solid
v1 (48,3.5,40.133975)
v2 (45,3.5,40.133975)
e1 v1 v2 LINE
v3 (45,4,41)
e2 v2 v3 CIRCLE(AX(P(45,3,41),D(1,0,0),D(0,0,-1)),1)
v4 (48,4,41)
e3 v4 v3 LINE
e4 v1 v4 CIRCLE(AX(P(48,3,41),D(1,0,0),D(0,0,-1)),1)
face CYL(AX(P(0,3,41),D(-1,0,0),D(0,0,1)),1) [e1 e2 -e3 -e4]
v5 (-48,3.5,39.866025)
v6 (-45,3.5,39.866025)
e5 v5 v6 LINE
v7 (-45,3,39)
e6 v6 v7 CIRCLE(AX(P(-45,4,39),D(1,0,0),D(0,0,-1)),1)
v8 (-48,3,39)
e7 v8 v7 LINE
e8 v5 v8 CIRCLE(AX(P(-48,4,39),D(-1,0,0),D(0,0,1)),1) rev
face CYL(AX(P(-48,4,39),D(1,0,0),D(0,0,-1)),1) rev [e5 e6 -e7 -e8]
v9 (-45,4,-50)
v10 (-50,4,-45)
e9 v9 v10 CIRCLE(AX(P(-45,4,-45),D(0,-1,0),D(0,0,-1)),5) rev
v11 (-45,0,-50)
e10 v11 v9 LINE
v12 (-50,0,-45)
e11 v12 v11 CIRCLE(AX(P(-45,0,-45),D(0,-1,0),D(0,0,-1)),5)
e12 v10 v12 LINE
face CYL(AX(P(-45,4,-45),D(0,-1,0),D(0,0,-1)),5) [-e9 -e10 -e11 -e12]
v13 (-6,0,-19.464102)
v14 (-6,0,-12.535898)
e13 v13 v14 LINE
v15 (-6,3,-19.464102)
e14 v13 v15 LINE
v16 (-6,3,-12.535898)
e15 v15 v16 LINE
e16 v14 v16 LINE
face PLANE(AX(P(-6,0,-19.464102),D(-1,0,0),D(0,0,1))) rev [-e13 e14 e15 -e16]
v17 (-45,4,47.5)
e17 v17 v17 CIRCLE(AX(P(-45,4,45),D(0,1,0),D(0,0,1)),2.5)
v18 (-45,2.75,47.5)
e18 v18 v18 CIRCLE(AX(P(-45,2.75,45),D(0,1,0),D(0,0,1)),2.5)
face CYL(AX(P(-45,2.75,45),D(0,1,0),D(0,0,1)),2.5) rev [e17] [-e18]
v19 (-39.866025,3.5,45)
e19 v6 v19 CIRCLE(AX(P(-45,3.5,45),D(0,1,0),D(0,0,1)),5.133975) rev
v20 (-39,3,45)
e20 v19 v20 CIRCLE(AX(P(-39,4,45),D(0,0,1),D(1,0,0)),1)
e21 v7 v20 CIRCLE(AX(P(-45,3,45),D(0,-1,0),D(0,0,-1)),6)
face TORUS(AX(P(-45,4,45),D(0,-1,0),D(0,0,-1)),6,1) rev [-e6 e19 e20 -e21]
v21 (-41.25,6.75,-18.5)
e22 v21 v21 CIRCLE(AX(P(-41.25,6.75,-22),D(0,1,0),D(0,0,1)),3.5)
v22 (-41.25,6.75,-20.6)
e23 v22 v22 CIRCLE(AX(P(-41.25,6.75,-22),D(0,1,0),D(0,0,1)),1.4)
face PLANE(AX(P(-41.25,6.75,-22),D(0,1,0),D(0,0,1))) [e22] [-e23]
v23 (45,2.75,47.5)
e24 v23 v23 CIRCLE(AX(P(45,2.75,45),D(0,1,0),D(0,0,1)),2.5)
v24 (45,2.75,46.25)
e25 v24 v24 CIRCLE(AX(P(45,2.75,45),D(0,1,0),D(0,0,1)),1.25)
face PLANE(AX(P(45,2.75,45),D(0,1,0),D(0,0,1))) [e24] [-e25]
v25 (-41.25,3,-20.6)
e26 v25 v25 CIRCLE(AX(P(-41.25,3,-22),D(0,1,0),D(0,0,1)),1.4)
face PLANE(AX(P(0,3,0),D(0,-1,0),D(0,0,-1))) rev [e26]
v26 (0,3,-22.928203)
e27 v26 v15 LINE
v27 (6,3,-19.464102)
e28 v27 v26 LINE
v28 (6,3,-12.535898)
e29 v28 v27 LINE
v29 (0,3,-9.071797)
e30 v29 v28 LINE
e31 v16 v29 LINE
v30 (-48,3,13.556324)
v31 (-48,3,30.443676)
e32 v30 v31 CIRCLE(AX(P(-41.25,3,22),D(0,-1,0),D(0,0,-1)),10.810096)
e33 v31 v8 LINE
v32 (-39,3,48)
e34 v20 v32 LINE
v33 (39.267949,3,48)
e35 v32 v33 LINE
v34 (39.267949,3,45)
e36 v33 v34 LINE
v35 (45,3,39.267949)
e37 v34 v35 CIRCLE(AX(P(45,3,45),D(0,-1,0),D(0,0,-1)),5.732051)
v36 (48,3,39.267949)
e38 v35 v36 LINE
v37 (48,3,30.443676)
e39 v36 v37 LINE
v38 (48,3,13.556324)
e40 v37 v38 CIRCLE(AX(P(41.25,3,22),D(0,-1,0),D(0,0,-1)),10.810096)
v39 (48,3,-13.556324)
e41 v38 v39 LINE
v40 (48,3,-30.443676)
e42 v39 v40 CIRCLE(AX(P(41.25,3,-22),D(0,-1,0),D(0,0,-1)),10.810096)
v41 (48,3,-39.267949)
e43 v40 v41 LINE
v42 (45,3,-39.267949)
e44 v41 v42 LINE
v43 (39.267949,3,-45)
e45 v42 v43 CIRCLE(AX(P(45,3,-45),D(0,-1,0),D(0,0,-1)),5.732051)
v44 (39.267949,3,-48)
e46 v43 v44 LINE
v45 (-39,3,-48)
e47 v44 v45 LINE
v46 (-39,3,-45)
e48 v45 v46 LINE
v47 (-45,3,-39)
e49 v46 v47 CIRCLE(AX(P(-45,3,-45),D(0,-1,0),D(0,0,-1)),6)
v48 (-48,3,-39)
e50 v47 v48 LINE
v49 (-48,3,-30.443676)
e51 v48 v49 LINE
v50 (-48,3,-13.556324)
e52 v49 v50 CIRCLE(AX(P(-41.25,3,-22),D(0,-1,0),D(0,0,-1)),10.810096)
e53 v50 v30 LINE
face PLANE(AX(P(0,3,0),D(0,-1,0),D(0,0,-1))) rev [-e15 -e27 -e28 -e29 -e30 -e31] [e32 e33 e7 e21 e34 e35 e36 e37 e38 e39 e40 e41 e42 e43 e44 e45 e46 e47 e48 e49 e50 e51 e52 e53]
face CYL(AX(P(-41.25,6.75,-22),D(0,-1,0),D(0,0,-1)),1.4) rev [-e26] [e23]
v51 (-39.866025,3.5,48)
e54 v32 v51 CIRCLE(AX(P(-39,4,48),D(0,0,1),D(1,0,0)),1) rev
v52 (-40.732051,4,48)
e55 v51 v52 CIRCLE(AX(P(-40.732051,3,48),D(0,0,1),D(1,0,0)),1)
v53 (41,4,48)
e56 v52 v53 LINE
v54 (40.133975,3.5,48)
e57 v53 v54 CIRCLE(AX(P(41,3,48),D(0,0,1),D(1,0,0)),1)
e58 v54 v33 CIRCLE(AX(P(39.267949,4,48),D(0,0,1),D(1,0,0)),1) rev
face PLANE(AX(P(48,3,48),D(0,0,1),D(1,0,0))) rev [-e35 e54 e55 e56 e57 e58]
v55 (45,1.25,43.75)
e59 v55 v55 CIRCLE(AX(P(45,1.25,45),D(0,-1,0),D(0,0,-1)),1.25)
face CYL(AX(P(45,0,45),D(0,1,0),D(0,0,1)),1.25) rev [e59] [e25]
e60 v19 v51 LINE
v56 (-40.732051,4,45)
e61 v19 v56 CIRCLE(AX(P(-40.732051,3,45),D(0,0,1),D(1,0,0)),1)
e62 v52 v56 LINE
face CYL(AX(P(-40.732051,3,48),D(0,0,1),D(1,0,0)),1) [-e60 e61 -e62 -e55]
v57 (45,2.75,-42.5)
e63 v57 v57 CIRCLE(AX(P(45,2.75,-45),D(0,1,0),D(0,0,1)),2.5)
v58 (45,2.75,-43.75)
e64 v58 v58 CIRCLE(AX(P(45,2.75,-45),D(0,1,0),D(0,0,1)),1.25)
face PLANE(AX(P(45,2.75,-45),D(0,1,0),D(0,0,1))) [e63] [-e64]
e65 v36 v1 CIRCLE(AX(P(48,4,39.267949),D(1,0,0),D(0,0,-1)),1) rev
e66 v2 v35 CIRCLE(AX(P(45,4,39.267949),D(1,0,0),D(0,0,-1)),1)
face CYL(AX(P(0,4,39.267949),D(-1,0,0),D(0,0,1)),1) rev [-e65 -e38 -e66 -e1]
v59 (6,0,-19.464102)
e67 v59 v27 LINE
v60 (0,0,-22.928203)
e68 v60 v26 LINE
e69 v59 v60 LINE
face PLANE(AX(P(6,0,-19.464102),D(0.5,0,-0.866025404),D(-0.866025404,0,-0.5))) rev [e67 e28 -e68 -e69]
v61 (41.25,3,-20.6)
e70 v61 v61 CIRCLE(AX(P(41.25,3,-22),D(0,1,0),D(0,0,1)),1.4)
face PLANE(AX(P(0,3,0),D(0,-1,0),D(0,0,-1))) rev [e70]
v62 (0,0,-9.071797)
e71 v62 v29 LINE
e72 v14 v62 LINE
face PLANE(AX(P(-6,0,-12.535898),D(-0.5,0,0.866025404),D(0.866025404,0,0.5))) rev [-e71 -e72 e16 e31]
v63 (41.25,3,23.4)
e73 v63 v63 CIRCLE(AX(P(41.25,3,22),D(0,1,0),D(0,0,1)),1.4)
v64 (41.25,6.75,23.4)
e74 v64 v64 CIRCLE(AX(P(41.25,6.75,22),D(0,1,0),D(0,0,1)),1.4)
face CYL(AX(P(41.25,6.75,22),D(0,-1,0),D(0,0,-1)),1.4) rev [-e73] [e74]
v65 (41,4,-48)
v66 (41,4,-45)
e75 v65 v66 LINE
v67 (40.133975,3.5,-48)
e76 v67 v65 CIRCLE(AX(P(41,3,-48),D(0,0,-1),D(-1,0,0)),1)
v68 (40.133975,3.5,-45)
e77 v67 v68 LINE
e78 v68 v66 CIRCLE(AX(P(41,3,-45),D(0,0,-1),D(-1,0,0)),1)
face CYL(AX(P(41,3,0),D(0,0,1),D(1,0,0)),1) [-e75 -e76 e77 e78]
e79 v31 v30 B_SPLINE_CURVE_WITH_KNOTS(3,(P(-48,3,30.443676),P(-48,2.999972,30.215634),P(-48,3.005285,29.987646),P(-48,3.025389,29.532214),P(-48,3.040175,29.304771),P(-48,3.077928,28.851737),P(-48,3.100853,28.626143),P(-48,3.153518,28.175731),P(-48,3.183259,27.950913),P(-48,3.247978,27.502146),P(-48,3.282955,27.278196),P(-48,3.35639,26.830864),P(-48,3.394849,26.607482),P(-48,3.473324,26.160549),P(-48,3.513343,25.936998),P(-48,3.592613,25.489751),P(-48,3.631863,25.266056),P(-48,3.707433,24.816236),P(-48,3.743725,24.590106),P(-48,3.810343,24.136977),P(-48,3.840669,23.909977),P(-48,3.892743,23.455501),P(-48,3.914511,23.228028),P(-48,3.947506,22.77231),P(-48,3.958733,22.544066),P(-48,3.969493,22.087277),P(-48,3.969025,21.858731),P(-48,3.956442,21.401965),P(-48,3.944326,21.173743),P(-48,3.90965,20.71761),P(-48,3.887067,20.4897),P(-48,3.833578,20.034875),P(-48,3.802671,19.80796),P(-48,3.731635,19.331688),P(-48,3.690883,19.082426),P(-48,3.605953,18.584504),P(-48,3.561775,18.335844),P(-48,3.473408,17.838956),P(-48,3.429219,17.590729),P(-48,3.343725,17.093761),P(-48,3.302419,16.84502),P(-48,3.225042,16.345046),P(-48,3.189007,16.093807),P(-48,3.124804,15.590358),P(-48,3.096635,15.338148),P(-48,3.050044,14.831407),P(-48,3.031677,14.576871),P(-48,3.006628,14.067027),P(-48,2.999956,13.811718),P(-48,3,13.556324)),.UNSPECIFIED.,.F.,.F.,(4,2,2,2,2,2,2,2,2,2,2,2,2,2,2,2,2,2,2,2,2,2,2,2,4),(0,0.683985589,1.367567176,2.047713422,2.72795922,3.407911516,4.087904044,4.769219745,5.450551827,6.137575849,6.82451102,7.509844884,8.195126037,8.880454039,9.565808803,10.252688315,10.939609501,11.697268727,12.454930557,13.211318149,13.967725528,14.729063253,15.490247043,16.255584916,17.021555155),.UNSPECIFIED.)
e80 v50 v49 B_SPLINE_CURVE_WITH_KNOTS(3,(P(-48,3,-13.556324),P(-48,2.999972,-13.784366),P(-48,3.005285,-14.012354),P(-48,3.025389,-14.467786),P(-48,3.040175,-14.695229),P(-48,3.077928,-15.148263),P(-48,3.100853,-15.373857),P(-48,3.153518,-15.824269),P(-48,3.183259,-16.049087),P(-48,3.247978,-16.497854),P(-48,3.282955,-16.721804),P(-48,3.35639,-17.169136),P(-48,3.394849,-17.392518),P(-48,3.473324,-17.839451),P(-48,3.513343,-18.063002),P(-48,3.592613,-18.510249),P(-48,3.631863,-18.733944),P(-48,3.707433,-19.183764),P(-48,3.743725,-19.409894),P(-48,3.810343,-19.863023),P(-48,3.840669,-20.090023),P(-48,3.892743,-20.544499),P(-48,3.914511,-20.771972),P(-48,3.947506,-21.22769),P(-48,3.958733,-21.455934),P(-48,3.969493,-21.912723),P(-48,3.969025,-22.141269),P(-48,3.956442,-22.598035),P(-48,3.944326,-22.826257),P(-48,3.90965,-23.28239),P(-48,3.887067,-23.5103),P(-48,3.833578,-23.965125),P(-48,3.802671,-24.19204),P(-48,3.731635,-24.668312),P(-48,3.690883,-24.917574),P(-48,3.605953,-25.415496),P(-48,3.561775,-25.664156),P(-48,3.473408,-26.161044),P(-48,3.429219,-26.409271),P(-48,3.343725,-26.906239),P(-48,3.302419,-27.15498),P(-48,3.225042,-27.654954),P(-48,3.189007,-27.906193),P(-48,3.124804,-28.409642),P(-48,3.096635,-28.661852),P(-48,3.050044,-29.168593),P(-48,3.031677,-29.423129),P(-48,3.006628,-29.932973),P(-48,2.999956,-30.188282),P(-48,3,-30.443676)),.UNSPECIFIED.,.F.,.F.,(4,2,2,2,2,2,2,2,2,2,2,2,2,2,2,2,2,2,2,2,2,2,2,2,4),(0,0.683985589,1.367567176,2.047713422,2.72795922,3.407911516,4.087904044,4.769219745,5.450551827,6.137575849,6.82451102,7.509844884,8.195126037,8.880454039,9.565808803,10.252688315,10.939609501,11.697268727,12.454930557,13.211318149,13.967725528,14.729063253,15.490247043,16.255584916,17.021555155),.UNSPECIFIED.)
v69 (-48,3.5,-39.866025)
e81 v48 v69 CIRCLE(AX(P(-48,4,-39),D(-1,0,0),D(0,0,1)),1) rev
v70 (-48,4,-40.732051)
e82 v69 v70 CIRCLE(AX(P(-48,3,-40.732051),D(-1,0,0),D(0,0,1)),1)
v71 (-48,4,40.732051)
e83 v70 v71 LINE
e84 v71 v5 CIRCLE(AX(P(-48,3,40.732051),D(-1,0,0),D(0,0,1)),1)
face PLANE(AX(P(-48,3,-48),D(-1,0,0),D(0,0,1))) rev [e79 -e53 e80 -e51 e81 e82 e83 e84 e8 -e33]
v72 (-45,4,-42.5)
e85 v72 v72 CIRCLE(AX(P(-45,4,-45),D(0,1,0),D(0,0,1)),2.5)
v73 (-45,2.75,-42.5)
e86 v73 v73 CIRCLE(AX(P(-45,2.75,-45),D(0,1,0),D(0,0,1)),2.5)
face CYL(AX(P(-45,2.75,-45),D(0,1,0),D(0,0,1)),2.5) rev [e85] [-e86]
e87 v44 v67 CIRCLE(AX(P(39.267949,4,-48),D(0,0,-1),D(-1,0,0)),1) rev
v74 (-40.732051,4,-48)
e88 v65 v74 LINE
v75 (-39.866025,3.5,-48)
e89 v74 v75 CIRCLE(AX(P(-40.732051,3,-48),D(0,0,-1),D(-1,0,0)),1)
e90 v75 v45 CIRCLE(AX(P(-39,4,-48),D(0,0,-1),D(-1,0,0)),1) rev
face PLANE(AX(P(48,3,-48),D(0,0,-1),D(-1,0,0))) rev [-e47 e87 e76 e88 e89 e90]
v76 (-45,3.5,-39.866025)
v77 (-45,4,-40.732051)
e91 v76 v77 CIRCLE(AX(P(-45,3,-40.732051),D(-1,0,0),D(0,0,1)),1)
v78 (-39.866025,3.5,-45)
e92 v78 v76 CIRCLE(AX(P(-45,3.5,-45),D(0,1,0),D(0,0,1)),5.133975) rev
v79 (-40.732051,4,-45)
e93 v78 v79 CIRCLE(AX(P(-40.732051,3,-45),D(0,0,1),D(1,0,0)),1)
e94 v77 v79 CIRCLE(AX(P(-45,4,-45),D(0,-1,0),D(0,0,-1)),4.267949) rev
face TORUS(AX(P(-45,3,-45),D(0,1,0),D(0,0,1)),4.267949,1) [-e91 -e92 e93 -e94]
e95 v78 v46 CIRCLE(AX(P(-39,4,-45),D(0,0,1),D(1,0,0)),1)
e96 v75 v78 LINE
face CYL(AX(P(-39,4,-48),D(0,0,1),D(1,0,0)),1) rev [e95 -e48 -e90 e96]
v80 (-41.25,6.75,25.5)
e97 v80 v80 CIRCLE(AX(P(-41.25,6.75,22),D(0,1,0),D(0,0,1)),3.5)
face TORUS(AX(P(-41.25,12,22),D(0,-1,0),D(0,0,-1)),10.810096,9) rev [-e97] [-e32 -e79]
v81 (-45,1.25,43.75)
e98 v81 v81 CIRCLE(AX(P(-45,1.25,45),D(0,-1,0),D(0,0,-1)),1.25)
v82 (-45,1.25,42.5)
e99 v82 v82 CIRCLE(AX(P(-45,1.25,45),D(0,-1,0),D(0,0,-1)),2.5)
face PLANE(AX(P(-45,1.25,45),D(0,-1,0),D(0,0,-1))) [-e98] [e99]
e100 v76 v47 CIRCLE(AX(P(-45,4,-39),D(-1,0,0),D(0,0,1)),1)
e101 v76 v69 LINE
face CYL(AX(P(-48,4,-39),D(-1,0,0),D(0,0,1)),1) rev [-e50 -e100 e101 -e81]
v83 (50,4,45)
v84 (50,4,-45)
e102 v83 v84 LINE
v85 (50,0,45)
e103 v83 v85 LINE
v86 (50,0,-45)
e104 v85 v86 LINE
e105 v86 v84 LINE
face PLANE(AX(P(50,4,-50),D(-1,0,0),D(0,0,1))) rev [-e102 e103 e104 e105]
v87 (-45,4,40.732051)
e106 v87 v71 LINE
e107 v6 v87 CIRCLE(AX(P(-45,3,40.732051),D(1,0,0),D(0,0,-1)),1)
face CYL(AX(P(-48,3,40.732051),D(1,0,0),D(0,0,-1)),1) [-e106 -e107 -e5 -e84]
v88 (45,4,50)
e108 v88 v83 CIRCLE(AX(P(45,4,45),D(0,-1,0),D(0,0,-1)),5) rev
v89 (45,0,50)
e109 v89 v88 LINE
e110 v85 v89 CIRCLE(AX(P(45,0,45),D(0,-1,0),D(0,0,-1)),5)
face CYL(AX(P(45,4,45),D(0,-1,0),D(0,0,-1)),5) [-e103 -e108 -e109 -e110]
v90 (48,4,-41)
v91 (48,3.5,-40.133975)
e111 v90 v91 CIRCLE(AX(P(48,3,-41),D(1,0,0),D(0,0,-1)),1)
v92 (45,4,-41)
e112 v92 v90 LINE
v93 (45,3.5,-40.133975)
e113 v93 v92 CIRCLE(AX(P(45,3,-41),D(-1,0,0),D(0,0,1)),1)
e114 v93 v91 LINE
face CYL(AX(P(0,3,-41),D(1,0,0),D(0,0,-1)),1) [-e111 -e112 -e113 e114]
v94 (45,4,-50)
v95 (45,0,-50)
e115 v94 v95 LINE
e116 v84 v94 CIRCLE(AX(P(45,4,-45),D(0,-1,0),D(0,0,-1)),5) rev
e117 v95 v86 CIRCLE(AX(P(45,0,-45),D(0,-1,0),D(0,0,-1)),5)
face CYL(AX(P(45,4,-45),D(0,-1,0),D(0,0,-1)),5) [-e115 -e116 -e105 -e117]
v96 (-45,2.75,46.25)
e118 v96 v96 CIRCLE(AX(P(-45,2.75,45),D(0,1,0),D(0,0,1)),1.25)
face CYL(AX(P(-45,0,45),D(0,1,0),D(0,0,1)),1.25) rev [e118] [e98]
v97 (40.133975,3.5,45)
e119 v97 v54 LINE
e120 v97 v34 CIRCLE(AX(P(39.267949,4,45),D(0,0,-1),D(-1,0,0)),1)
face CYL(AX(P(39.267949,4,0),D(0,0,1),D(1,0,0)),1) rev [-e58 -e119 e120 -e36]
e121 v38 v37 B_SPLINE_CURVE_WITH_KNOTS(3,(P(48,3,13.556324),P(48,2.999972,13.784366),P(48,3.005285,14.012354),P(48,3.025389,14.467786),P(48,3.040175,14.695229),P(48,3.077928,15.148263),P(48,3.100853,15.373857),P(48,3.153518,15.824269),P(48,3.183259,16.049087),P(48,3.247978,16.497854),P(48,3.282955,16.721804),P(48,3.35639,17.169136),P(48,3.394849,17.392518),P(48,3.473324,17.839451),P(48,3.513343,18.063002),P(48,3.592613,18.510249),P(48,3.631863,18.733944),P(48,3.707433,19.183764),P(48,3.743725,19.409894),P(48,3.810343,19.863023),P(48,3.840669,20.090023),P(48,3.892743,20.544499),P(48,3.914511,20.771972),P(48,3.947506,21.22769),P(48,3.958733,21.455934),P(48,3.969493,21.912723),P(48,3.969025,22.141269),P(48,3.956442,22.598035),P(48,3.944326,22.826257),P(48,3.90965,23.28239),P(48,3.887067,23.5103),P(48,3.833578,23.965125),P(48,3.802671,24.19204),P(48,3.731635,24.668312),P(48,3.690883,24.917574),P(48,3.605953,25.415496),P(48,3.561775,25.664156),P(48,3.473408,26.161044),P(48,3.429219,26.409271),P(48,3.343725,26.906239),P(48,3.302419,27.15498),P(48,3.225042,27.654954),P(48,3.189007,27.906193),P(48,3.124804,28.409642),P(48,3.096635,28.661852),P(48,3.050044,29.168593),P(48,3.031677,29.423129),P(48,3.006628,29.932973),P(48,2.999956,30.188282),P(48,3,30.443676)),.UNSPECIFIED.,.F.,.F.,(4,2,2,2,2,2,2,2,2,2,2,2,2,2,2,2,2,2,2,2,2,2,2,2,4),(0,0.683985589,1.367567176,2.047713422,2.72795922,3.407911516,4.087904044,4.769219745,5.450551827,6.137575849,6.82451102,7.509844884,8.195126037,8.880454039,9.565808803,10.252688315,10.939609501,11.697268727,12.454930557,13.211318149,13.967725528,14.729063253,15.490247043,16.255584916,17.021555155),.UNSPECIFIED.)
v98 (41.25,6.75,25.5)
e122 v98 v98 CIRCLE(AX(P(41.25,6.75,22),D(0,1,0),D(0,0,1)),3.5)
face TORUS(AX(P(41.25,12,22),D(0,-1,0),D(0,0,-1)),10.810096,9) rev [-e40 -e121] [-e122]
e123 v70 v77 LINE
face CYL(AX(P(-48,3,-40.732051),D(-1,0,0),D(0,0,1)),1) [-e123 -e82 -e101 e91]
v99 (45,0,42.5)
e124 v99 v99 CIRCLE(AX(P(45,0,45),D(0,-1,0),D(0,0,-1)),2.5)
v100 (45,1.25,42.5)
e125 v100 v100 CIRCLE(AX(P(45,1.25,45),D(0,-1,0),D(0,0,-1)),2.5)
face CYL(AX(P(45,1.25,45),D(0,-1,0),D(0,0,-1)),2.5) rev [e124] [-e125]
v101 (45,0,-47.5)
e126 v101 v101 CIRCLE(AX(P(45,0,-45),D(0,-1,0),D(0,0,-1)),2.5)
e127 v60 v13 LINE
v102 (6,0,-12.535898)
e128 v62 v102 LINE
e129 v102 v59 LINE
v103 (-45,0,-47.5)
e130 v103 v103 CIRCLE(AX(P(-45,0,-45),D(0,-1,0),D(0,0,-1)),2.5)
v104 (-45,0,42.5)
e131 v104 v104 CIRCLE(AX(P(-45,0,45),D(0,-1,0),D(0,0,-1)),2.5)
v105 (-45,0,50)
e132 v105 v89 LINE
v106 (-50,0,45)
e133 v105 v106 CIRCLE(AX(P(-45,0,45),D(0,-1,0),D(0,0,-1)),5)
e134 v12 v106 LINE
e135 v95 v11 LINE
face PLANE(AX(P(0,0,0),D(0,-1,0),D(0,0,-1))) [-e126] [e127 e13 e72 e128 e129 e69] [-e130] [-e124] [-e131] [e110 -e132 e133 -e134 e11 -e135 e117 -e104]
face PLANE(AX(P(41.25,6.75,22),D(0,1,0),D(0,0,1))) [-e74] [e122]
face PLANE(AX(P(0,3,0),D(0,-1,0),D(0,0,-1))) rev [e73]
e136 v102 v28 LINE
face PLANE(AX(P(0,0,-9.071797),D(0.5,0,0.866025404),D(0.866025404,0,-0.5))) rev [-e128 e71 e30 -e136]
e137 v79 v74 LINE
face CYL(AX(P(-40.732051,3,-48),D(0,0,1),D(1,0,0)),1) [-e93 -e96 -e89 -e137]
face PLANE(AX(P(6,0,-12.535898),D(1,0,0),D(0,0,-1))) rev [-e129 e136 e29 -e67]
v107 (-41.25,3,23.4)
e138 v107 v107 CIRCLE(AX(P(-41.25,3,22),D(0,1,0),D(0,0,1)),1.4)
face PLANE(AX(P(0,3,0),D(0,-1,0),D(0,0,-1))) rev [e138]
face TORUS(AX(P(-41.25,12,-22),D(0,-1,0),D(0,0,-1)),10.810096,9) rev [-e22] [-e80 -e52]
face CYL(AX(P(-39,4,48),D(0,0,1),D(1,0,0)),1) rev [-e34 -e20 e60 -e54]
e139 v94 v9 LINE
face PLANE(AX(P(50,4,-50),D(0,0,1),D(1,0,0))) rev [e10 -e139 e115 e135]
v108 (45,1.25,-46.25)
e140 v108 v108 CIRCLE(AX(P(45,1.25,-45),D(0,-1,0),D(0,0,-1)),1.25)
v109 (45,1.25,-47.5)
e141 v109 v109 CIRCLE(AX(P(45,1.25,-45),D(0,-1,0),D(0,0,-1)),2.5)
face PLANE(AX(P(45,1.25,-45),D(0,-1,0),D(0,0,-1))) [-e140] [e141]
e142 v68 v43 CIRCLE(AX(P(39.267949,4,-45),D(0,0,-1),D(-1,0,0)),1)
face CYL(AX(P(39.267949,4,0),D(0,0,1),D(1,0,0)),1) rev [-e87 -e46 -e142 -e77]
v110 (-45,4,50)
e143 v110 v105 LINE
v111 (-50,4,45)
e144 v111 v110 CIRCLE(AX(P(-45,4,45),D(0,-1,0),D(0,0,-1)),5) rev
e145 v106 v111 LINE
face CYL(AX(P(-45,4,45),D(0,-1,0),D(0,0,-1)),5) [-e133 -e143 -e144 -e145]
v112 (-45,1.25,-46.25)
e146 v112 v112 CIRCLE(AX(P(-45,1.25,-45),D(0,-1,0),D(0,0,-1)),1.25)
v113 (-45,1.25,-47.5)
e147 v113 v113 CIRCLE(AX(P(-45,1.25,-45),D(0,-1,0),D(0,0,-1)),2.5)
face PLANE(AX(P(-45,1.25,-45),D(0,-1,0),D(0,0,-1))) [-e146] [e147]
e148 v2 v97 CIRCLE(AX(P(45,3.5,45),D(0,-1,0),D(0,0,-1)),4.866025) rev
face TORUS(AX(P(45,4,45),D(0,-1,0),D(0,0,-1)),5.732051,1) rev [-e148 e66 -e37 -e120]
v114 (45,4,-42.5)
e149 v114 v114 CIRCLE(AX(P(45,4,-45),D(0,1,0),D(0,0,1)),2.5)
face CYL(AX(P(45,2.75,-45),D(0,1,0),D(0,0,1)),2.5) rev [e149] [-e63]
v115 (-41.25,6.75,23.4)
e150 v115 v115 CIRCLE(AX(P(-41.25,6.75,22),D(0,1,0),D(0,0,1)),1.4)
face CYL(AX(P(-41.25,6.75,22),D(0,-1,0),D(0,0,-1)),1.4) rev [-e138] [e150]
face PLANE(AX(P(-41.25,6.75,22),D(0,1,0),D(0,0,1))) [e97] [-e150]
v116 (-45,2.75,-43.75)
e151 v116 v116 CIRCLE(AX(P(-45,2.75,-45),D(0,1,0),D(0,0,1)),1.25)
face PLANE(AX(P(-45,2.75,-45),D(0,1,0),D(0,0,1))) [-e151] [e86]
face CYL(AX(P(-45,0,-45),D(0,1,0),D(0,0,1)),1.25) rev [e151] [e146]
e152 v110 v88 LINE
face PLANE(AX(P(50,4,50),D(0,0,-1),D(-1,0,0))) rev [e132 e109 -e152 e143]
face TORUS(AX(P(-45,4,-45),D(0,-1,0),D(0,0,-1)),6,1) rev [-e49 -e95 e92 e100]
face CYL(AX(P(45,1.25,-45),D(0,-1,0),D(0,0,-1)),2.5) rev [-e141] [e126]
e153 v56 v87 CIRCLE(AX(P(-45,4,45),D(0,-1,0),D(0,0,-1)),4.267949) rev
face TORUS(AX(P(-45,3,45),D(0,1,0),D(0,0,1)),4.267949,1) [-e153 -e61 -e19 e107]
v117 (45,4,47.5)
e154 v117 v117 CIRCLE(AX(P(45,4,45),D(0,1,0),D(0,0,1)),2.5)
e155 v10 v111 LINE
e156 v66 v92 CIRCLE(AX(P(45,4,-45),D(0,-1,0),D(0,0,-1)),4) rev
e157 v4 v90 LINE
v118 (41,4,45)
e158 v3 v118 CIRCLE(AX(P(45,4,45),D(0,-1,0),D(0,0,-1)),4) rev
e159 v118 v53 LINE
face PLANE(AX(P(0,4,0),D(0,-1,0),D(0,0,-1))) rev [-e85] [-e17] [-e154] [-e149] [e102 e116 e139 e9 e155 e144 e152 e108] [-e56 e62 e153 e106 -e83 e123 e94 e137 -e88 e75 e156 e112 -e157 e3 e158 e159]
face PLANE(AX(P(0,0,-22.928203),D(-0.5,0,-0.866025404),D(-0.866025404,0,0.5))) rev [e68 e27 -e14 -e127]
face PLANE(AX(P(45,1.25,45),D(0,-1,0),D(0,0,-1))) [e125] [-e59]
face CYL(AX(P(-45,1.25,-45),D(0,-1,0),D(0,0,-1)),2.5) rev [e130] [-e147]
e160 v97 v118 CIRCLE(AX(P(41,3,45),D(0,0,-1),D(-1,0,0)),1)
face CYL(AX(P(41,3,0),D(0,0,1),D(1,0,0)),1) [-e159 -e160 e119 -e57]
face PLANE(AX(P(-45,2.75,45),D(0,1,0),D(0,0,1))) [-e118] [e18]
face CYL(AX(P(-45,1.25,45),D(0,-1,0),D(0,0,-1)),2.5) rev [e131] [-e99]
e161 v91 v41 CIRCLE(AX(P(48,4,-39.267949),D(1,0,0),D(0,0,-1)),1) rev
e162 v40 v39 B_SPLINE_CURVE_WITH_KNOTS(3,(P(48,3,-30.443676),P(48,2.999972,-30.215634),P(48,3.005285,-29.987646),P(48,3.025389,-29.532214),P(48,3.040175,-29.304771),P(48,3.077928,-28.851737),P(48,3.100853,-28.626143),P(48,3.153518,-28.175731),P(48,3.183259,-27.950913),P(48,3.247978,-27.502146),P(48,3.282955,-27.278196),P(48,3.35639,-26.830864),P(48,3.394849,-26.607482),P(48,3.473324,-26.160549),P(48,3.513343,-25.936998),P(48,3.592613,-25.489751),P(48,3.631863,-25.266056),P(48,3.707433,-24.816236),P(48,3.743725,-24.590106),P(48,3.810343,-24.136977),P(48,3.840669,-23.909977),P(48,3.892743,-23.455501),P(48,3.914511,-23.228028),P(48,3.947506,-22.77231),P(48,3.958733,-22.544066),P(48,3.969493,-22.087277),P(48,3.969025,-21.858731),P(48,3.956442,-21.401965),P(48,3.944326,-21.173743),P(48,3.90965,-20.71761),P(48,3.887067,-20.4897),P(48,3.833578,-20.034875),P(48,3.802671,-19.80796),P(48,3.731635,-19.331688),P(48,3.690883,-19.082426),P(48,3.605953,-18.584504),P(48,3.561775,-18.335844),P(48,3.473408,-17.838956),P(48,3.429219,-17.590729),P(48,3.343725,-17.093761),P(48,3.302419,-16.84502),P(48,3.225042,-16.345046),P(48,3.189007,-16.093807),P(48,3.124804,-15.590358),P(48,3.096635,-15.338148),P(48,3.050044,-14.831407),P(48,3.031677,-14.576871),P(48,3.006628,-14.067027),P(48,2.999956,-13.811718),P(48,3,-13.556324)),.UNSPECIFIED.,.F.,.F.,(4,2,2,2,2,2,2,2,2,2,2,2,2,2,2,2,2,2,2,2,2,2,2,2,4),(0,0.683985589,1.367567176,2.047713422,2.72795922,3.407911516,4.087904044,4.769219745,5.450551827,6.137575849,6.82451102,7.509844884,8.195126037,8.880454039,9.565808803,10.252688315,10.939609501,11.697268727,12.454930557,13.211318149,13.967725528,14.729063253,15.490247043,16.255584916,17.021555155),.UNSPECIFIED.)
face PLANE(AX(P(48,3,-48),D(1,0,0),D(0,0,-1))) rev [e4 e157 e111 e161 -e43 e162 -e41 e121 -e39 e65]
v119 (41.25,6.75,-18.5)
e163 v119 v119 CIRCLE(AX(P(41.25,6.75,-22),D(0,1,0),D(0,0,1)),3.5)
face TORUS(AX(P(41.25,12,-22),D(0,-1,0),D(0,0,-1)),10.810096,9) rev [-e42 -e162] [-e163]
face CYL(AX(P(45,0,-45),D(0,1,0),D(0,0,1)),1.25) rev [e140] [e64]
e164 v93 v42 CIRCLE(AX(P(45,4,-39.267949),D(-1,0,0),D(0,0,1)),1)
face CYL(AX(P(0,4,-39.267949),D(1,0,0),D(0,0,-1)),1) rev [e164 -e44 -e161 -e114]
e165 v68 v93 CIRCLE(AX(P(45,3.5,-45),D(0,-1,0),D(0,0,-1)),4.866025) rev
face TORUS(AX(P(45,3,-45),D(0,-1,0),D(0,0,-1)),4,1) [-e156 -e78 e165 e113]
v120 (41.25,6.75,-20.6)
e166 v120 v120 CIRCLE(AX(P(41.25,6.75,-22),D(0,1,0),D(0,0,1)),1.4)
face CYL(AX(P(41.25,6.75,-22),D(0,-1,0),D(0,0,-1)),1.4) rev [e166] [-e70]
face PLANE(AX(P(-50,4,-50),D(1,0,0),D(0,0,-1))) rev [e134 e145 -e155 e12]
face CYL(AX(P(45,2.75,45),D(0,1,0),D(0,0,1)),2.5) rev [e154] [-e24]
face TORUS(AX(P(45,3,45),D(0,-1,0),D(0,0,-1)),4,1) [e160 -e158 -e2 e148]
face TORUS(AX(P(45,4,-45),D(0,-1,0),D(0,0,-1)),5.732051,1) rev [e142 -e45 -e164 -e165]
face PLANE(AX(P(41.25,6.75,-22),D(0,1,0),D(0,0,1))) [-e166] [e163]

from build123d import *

# Parameters (mm, degrees)
SKETCH1_W            = 100
SKETCH1_H            = 100
BOSS_EXTRUDE1_DEPTH  = 4
SKETCH2_W            = 96
SKETCH2_H            = 96
CUT_EXTRUDE1_DEPTH   = 1
SKETCH7_W            = 8
SKETCH7_H            = 8
BOSS_EXTRUDE4_DEPTH  = 1
SKETCH9_W            = 8
SKETCH9_H            = 8
BOSS_EXTRUDE5_DEPTH  = 1
SKETCH10_W           = 8
SKETCH10_H           = 8
BOSS_EXTRUDE6_DEPTH  = 1
SKETCH11_W           = 8
SKETCH11_H           = 8
BOSS_EXTRUDE7_DEPTH  = 1
FILLET8_R            = 5
FILLET9_R            = 5
FILLET10_R           = 5
FILLET11_R           = 5
FILLET12_R           = 5
FILLET13_R           = 5
FILLET14_R           = 5
FILLET15_R           = 5
FILLET18_R           = 1
FILLET19_R           = 1
FILLET20_R           = 1
FILLET21_R           = 1
FILLET22_R           = 1
FILLET23_R           = 1
FILLET24_R           = 1
FILLET25_R           = 1
SKETCH15_R           = 2.5
CUT_EXTRUDE7_DEPTH   = 1.25
CUT_EXTRUDE8_START   = -1.25
SKETCH16_R           = 2.5
CUT_EXTRUDE8_DEPTH   = 1.25
SKETCH17_R           = 1.1
CUT_EXTRUDE9_DEPTH   = 1.5
SKETCH18_R           = 2.5
CUT_EXTRUDE10_DEPTH  = 1.25
CUT_EXTRUDE11_START  = -1.25
SKETCH19_R           = 2.5
CUT_EXTRUDE11_DEPTH  = 1.25
SKETCH20_R           = 1.05
CUT_EXTRUDE12_DEPTH  = 71.764132864
SKETCH21_R           = 2.5
CUT_EXTRUDE13_DEPTH  = 1.25
CUT_EXTRUDE14_START  = -1.25
SKETCH23_R           = 2.5
CUT_EXTRUDE14_DEPTH  = 1.25
SKETCH24_R           = 1.05
CUT_EXTRUDE15_DEPTH  = 71.764132864
SKETCH25_R           = 2.5
CUT_EXTRUDE16_DEPTH  = 1.25
CUT_EXTRUDE17_START  = -1.25
SKETCH26_R           = 2.5
CUT_EXTRUDE17_DEPTH  = 1.25
SKETCH27_R           = 1.05
CUT_EXTRUDE18_DEPTH  = 71.764132864
SKETCH35_R           = 1.25
CUT_EXTRUDE23_DEPTH  = 71.764132864
SKETCH36_R           = 1.25
CUT_EXTRUDE24_DEPTH  = 71.764132864
SKETCH37_R           = 1.25
CUT_EXTRUDE25_DEPTH  = 71.764132864
SKETCH38_R           = 1.25
CUT_EXTRUDE26_DEPTH  = 71.764132864
SKETCH39_R           = 3.5
SKETCH39_R_2         = 1.4
BOSS_EXTRUDE12_DEPTH = 3.75
FILLET27_R           = 9
CUT_EXTRUDE27_DEPTH  = 71.810045197


# Some blends are built 0.0001 mm under size
with BuildPart() as part:
    # Sketch1 → Boss-Extrude1 (new body)
    with BuildSketch(Plane(origin=(0, 0, 0), x_dir=(1, 0, 0), z_dir=(0, 1, 0))):
        Rectangle(SKETCH1_W, SKETCH1_H)
    extrude(amount=BOSS_EXTRUDE1_DEPTH)

    # Sketch2 → Cut-Extrude1 (cut)
    with BuildSketch(Plane(origin=(0, 4, 0), x_dir=(1, 0, 0), z_dir=(0, 1, 0))):
        Rectangle(SKETCH2_W, SKETCH2_H)
    extrude(amount=-CUT_EXTRUDE1_DEPTH, mode=Mode.SUBTRACT)

    # Sketch7 → Boss-Extrude4 (add)
    with BuildSketch(Plane(origin=(0, 3, 0), x_dir=(1, 0, 0), z_dir=(0, 1, 0))):
        with Locations((-44, 44)):
            Rectangle(SKETCH7_W, SKETCH7_H)
    extrude(amount=BOSS_EXTRUDE4_DEPTH)

    # Sketch9 → Boss-Extrude5 (add)
    with BuildSketch(Plane(origin=(0, 3, 0), x_dir=(1, 0, 0), z_dir=(0, 1, 0))):
        with Locations((44, 44)):
            Rectangle(SKETCH9_W, SKETCH9_H)
    extrude(amount=BOSS_EXTRUDE5_DEPTH)

    # Sketch10 → Boss-Extrude6 (add)
    with BuildSketch(Plane(origin=(0, 3, 0), x_dir=(1, 0, 0), z_dir=(0, 1, 0))):
        with Locations((-44, -44)):
            Rectangle(SKETCH10_W, SKETCH10_H)
    extrude(amount=BOSS_EXTRUDE6_DEPTH)

    # Sketch11 → Boss-Extrude7 (add)
    with BuildSketch(Plane(origin=(0, 3, 0), x_dir=(1, 0, 0), z_dir=(0, 1, 0))):
        with Locations((44, -44)):
            Rectangle(SKETCH11_W, SKETCH11_H)
    extrude(amount=BOSS_EXTRUDE7_DEPTH)

    # Fillet8
    fillet8_edges = [part.edges().sort_by_distance(p)[0] for p in [
        (-40, 3.5, -40),
    ]]
    fillet(fillet8_edges, radius=FILLET8_R)

    # Fillet9
    fillet9_edges = [part.edges().sort_by_distance(p)[0] for p in [
        (-40, 3.5, 40),
    ]]
    fillet(fillet9_edges, radius=FILLET9_R)

    # Fillet10
    fillet10_edges = [part.edges().sort_by_distance(p)[0] for p in [
        (40, 3.5, 40),
    ]]
    fillet(fillet10_edges, radius=FILLET10_R)

    # Fillet11
    fillet11_edges = [part.edges().sort_by_distance(p)[0] for p in [
        (40, 3.5, -40),
    ]]
    fillet(fillet11_edges, radius=FILLET11_R)

    # Fillet12
    fillet12_edges = [part.edges().sort_by_distance(p)[0] for p in [
        (50, 2, -50),
    ]]
    fillet(fillet12_edges, radius=FILLET12_R)

    # Fillet13
    fillet13_edges = [part.edges().sort_by_distance(p)[0] for p in [
        (50, 2, 50),
    ]]
    fillet(fillet13_edges, radius=FILLET13_R)

    # Fillet14
    fillet14_edges = [part.edges().sort_by_distance(p)[0] for p in [
        (-50, 2, 50),
    ]]
    fillet(fillet14_edges, radius=FILLET14_R)

    # Fillet15
    fillet15_edges = [part.edges().sort_by_distance(p)[0] for p in [
        (-50, 2, -50),
    ]]
    fillet(fillet15_edges, radius=FILLET15_R)

    # Fillet18
    fillet18_edges = [part.edges().sort_by_distance(p)[0] for p in [
        (-40, 3, -46.5),
        (-46.5, 3, -40),
        (-41.464466094, 3, -41.464466094),
    ]]
    fillet(fillet18_edges, radius=FILLET18_R - 0.0001)  # a hair under: the kernel refuses the full size

    # Fillet19
    # the kernel refuses this fillet: 1 mm, written as the material it takes off along each edge
    with BuildSketch(Plane(origin=(-45, 4, -40), x_dir=(0, 0, -1), z_dir=(-1, 0, 0))) as fillet19_piece_1:
        with BuildLine():
            CenterArc((0.732093072, 1), FILLET19_R, 209.998345944, 60.001654056)
            Line((-0.133946766, 0.500025001), (-0.22055075, 0.450027501))
            ThreePointArc((-0.22055075, 0.450027501), (-0.1, 0.0001), (-0.1, 0))
            Line((-0.1, 0), (0, -0.1))
            Line((0, -0.1), (0.732093072, -0.1))
            Line((0.732093072, -0.1), (0.732093072, 0))
        make_face()
    extrude(amount=3, mode=Mode.SUBTRACT)
    with BuildSketch(Plane(origin=(-40, 4, -48), x_dir=(0.2587568099374835, -0.9659425000024469, 0), z_dir=(0, 0, 1))) as fillet19_piece_2:
        with BuildLine():
            CenterArc((0.776508432, -0.965916622), FILLET19_R, 105.002037513, 60.001654056)
            Line((-0.189434068, -0.707159812), (-0.286028318, -0.681284131))
            Line((-0.286028318, -0.681284131), (-0.09659425, 0.025875681))
            Line((-0.09659425, 0.025875681), (0.025875681, 0.09659425))
            ThreePointArc((0.025875681, 0.09659425), (0.025972275, 0.096568374), (0.491769698, 0.096591662))
            Line((0.491769698, 0.096591662), (0.517655038, 0))
        make_face()
    extrude(amount=3, mode=Mode.SUBTRACT)
    with BuildSketch(Plane(origin=(-45, 4, -45), x_dir=(0, 0, 1), z_dir=(-1, 0, 0))) as fillet19_piece_3:
        with BuildLine():
            CenterArc((4.267906928, -1), FILLET19_R, 29.998345944, 60.001654056)
            Line((5.133946766, -0.500025001), (5.22055075, -0.450027501))
            ThreePointArc((5.22055075, -0.450027501), (5.1, -0.0001), (5.1, 0))
            Line((5.1, 0), (5, 0.1))
            Line((5, 0.1), (4.267906928, 0.1))
            Line((4.267906928, 0.1), (4.267906928, 0))
        make_face()
    revolve(axis=Axis((-45, 4, -45), (0, 1, 0)), revolution_arc=90, mode=Mode.SUBTRACT)

    # Fillet20
    fillet20_edges = [part.edges().sort_by_distance(p)[0] for p in [
        (40, 4, -46.5),
        (46.5, 4, -40),
        (41.464466094, 4, -41.464466094),
    ]]
    fillet(fillet20_edges, radius=FILLET20_R - 0.0001)  # a hair under: the kernel refuses the full size

    # Fillet21
    fillet21_edges = [part.edges().sort_by_distance(p)[0] for p in [
        (46.5, 3, -40),
        (41.464466094, 3, -41.464466094),
        (40, 3, -46.5),
    ]]
    fillet(fillet21_edges, radius=FILLET21_R)

    # Fillet22
    fillet22_edges = [part.edges().sort_by_distance(p)[0] for p in [
        (-46.5, 3, 40),
        (-40, 3, 46.5),
        (-41.464466094, 3, 41.464466094),
    ]]
    fillet(fillet22_edges, radius=FILLET22_R - 0.0001)  # a hair under: the kernel refuses the full size

    # Fillet23
    # the kernel refuses this fillet: 1 mm, written as the material it takes off along each edge
    with BuildSketch(Plane(origin=(-40, 4, 48), x_dir=(-1, 0, 0), z_dir=(0, 0, -1))) as fillet23_piece_1:
        with BuildLine():
            CenterArc((0.732093072, -1), FILLET23_R, 90, 60.001654056)
            Line((-0.133946766, -0.500025001), (-0.22055075, -0.450027501))
            ThreePointArc((-0.22055075, -0.450027501), (-0.1, -0.0001), (-0.1, 0))
            Line((-0.1, 0), (0, 0.1))
            Line((0, 0.1), (0.732093072, 0.1))
            Line((0.732093072, 0.1), (0.732093072, 0))
        make_face()
    extrude(amount=3, mode=Mode.SUBTRACT)
    with BuildSketch(Plane(origin=(-45, 4, 40), x_dir=(0, -0.9659425000024469, -0.2587568099374835), z_dir=(-1, 0, 0))) as fillet23_piece_2:
        with BuildLine():
            CenterArc((0.776508432, 0.965916622), FILLET23_R, 194.996308431, 60.001654056)
            Line((-0.189434068, 0.707159812), (-0.286028318, 0.681284131))
            Line((-0.286028318, 0.681284131), (-0.09659425, -0.025875681))
            Line((-0.09659425, -0.025875681), (0.025875681, -0.09659425))
            ThreePointArc((0.025875681, -0.09659425), (0.025972275, -0.096568374), (0.491769698, -0.096591662))
            Line((0.491769698, -0.096591662), (0.517655038, 0))
        make_face()
    extrude(amount=3, mode=Mode.SUBTRACT)
    with BuildSketch(Plane(origin=(-45, 4, 45), x_dir=(0, 0, -1), z_dir=(-1, 0, 0))) as fillet23_piece_3:
        with BuildLine():
            CenterArc((4.267906928, 1), FILLET23_R, 270, 60.001654056)
            Line((5.133946766, 0.500025001), (5.22055075, 0.450027501))
            ThreePointArc((5.22055075, 0.450027501), (5.1, 0.0001), (5.1, 0))
            Line((5.1, 0), (5, -0.1))
            Line((5, -0.1), (4.267906928, -0.1))
            Line((4.267906928, -0.1), (4.267906928, 0))
        make_face()
    revolve(axis=Axis((-45, 4, 45), (0, -1, 0)), revolution_arc=90, mode=Mode.SUBTRACT)

    # Fillet24
    fillet24_edges = [part.edges().sort_by_distance(p)[0] for p in [
        (46.5, 4, 40),
        (40, 4, 46.5),
        (41.464466094, 4, 41.464466094),
    ]]
    fillet(fillet24_edges, radius=FILLET24_R - 0.0001)  # a hair under: the kernel refuses the full size

    # Fillet25
    fillet25_edges = [part.edges().sort_by_distance(p)[0] for p in [
        (40, 3, 46.5),
        (41.464466094, 3, 41.464466094),
        (46.5, 3, 40),
    ]]
    fillet(fillet25_edges, radius=FILLET25_R)

    # Sketch15 → Cut-Extrude7 (cut)
    with BuildSketch(Plane(origin=(0, 4, 0), x_dir=(1, 0, 0), z_dir=(0, 1, 0))):
        with Locations(Location((-45, 45, 0), (0, 0, 270))):
            Circle(SKETCH15_R)
    extrude(amount=-CUT_EXTRUDE7_DEPTH, mode=Mode.SUBTRACT)

    # Sketch16 → Cut-Extrude8 (cut)
    with BuildSketch(Plane.XZ.offset(CUT_EXTRUDE8_START)):
        with Locations(Location((-45, -45, 0), (0, 0, 90))):
            Circle(SKETCH16_R)
    extrude(amount=CUT_EXTRUDE8_DEPTH, mode=Mode.SUBTRACT)

    # Sketch17 → Cut-Extrude9 (cut)
    with BuildSketch(Plane(origin=(0, 2.75, 0), x_dir=(1, 0, 0), z_dir=(0, 1, 0))):
        with Locations(Location((-45, 45, 0), (0, 0, 270))):
            Circle(SKETCH17_R)
    extrude(amount=-CUT_EXTRUDE9_DEPTH, mode=Mode.SUBTRACT)

    # Sketch18 → Cut-Extrude10 (cut)
    with BuildSketch(Plane(origin=(0, 4, 0), x_dir=(1, 0, 0), z_dir=(0, 1, 0))):
        with Locations(Location((45, 45, 0), (0, 0, 270))):
            Circle(SKETCH18_R)
    extrude(amount=-CUT_EXTRUDE10_DEPTH, mode=Mode.SUBTRACT)

    # Sketch19 → Cut-Extrude11 (cut)
    with BuildSketch(Plane.XZ.offset(CUT_EXTRUDE11_START)):
        with Locations(Location((45, -45, 0), (0, 0, 90))):
            Circle(SKETCH19_R)
    extrude(amount=CUT_EXTRUDE11_DEPTH, mode=Mode.SUBTRACT)

    # Sketch20 → Cut-Extrude12 (cut, through all)
    with BuildSketch(Plane(origin=(0, 2.75, 0), x_dir=(1, 0, 0), z_dir=(0, 1, 0))):
        with Locations(Location((45, 45, 0), (0, 0, 270))):
            Circle(SKETCH20_R)
    extrude(amount=-CUT_EXTRUDE12_DEPTH, mode=Mode.SUBTRACT)

    # Sketch21 → Cut-Extrude13 (cut)
    with BuildSketch(Plane(origin=(0, 4, 0), x_dir=(1, 0, 0), z_dir=(0, 1, 0))):
        with Locations(Location((-45, -45, 0), (0, 0, 270))):
            Circle(SKETCH21_R)
    extrude(amount=-CUT_EXTRUDE13_DEPTH, mode=Mode.SUBTRACT)

    # Sketch23 → Cut-Extrude14 (cut)
    with BuildSketch(Plane(origin=(0, 0, 0), x_dir=(-1, 0, 0), z_dir=(0, -1, 0)).offset(CUT_EXTRUDE14_START)):
        with Locations(Location((45, -45, 0), (0, 0, 270))):
            Circle(SKETCH23_R)
    extrude(amount=CUT_EXTRUDE14_DEPTH, mode=Mode.SUBTRACT)

    # Sketch24 → Cut-Extrude15 (cut, through all)
    with BuildSketch(Plane(origin=(0, 2.75, 0), x_dir=(1, 0, 0), z_dir=(0, 1, 0))):
        with Locations(Location((-45, -45, 0), (0, 0, 270))):
            Circle(SKETCH24_R)
    extrude(amount=-CUT_EXTRUDE15_DEPTH, mode=Mode.SUBTRACT)

    # Sketch25 → Cut-Extrude16 (cut)
    with BuildSketch(Plane.XZ):
        with Locations(Location((45, 45, 0), (0, 0, 270))):
            Circle(SKETCH25_R)
    extrude(amount=-CUT_EXTRUDE16_DEPTH, mode=Mode.SUBTRACT)

    # Sketch26 → Cut-Extrude17 (cut)
    with BuildSketch(Plane(origin=(0, 4, 0), x_dir=(1, 0, 0), z_dir=(0, 1, 0)).offset(CUT_EXTRUDE17_START)):
        with Locations(Location((45, -45, 0), (0, 0, 90))):
            Circle(SKETCH26_R)
    extrude(amount=CUT_EXTRUDE17_DEPTH, mode=Mode.SUBTRACT)

    # Sketch27 → Cut-Extrude18 (cut, through all)
    with BuildSketch(Plane(origin=(0, 2.75, 0), x_dir=(1, 0, 0), z_dir=(0, 1, 0))):
        with Locations(Location((45, -45, 0), (0, 0, 270))):
            Circle(SKETCH27_R)
    extrude(amount=-CUT_EXTRUDE18_DEPTH, mode=Mode.SUBTRACT)

    # Sketch35 → Cut-Extrude23 (cut, through all)
    with BuildSketch(Plane(origin=(0, 2.75, 0), x_dir=(1, 0, 0), z_dir=(0, 1, 0))):
        with Locations(Location((-45, 45, 0), (0, 0, 270))):
            Circle(SKETCH35_R)
    extrude(amount=-CUT_EXTRUDE23_DEPTH, mode=Mode.SUBTRACT)

    # Sketch36 → Cut-Extrude24 (cut, through all)
    with BuildSketch(Plane(origin=(0, 2.75, 0), x_dir=(1, 0, 0), z_dir=(0, 1, 0))):
        with Locations(Location((45, 45, 0), (0, 0, 270))):
            Circle(SKETCH36_R)
    extrude(amount=-CUT_EXTRUDE24_DEPTH, mode=Mode.SUBTRACT)

    # Sketch37 → Cut-Extrude25 (cut, through all)
    with BuildSketch(Plane(origin=(0, 2.75, 0), x_dir=(1, 0, 0), z_dir=(0, 1, 0))):
        with Locations(Location((-45, -45, 0), (0, 0, 270))):
            Circle(SKETCH37_R)
    extrude(amount=-CUT_EXTRUDE25_DEPTH, mode=Mode.SUBTRACT)

    # Sketch38 → Cut-Extrude26 (cut, through all)
    with BuildSketch(Plane(origin=(0, 2.75, 0), x_dir=(1, 0, 0), z_dir=(0, 1, 0))):
        with Locations(Location((45, -45, 0), (0, 0, 270))):
            Circle(SKETCH38_R)
    extrude(amount=-CUT_EXTRUDE26_DEPTH, mode=Mode.SUBTRACT)

    # Sketch39 → Boss-Extrude12 (add)
    # profile 1 of 4: a face of its own
    with BuildSketch(Plane(origin=(0, 3, 0), x_dir=(1, 0, 0), z_dir=(0, 1, 0))):
        with Locations(Location((41.25, 22, 0), (0, 0, 90))):
            Circle(SKETCH39_R)
        with Locations(Location((41.25, 22, 0), (0, 0, 270))):
            Circle(SKETCH39_R_2, mode=Mode.SUBTRACT)
    # profile 2 of 4: a face of its own
    with BuildSketch(Plane(origin=(0, 3, 0), x_dir=(1, 0, 0), z_dir=(0, 1, 0))):
        with Locations(Location((-41.25, 22, 0), (0, 0, 90))):
            Circle(SKETCH39_R)
        with Locations(Location((-41.25, 22, 0), (0, 0, 270))):
            Circle(SKETCH39_R_2, mode=Mode.SUBTRACT)
    # profile 3 of 4: a face of its own
    with BuildSketch(Plane(origin=(0, 3, 0), x_dir=(1, 0, 0), z_dir=(0, 1, 0))):
        with Locations(Location((-41.25, -22, 0), (0, 0, 90))):
            Circle(SKETCH39_R)
        with Locations(Location((-41.25, -22, 0), (0, 0, 270))):
            Circle(SKETCH39_R_2, mode=Mode.SUBTRACT)
    # profile 4 of 4: a face of its own
    with BuildSketch(Plane(origin=(0, 3, 0), x_dir=(1, 0, 0), z_dir=(0, 1, 0))):
        with Locations(Location((41.25, -22, 0), (0, 0, 90))):
            Circle(SKETCH39_R)
        with Locations(Location((41.25, -22, 0), (0, 0, 270))):
            Circle(SKETCH39_R_2, mode=Mode.SUBTRACT)
    extrude(amount=BOSS_EXTRUDE12_DEPTH)

    # Fillet27
    # the kernel refuses this fillet: 9 mm, written as the material it adds along each edge
    with BuildSketch(Plane(origin=(41.25, 3, -22), x_dir=(0, 0, -1), z_dir=(1, 0, 0))) as fillet27_piece_1_section:
        with BuildLine():
            CenterArc((10.810095759, 9), FILLET27_R, 215.685334713, 54.314665287)
            Line((3.5, 3.75), (3.5, 0))
            Line((3.5, 0), (10.810095759, 0))
        make_face()
    fillet27_piece_1 = revolve(axis=Axis((41.25, 3, -22), (0, 1, 0)), mode=Mode.PRIVATE)
    fillet27_piece_1 = split(fillet27_piece_1, bisect_by=Plane(origin=(48, 3, -22), z_dir=(-1, 0, 0)), keep=Keep.TOP, mode=Mode.PRIVATE)
    add(fillet27_piece_1)
    with BuildSketch(Plane(origin=(-41.25, 3, -22), x_dir=(0, 0, -1), z_dir=(1, 0, 0))) as fillet27_piece_2_section:
        with BuildLine():
            CenterArc((10.810095759, 9), FILLET27_R, 215.685334713, 54.314665287)
            Line((3.5, 3.75), (3.5, 0))
            Line((3.5, 0), (10.810095759, 0))
        make_face()
    fillet27_piece_2 = revolve(axis=Axis((-41.25, 3, -22), (0, 1, 0)), mode=Mode.PRIVATE)
    fillet27_piece_2 = split(fillet27_piece_2, bisect_by=Plane(origin=(-48, 3, -22), z_dir=(1, 0, 0)), keep=Keep.TOP, mode=Mode.PRIVATE)
    add(fillet27_piece_2)
    with BuildSketch(Plane(origin=(-41.25, 3, 22), x_dir=(0, 0, -1), z_dir=(1, 0, 0))) as fillet27_piece_3_section:
        with BuildLine():
            CenterArc((10.810095759, 9), FILLET27_R, 215.685334713, 54.314665287)
            Line((3.5, 3.75), (3.5, 0))
            Line((3.5, 0), (10.810095759, 0))
        make_face()
    fillet27_piece_3 = revolve(axis=Axis((-41.25, 3, 22), (0, 1, 0)), mode=Mode.PRIVATE)
    fillet27_piece_3 = split(fillet27_piece_3, bisect_by=Plane(origin=(-48, 3, 22), z_dir=(1, 0, 0)), keep=Keep.TOP, mode=Mode.PRIVATE)
    add(fillet27_piece_3)
    with BuildSketch(Plane(origin=(41.25, 3, 22), x_dir=(0, 0, -1), z_dir=(1, 0, 0))) as fillet27_piece_4_section:
        with BuildLine():
            CenterArc((10.810095759, 9), FILLET27_R, 215.685334713, 54.314665287)
            Line((3.5, 3.75), (3.5, 0))
            Line((3.5, 0), (10.810095759, 0))
        make_face()
    fillet27_piece_4 = revolve(axis=Axis((41.25, 3, 22), (0, 1, 0)), mode=Mode.PRIVATE)
    fillet27_piece_4 = split(fillet27_piece_4, bisect_by=Plane(origin=(48, 3, 22), z_dir=(-1, 0, 0)), keep=Keep.TOP, mode=Mode.PRIVATE)
    add(fillet27_piece_4)

    # Sketch40 → Cut-Extrude27 (cut, through all)
    with BuildSketch(Plane(origin=(0, 3, 0), x_dir=(1, 0, 0), z_dir=(0, 1, 0))):
        Polygon((0, 9.07179677), (6, 12.535898385), (6, 19.464101615), (0, 22.92820323), (-6, 19.464101615), (-6, 12.535898385), align=None)
    extrude(amount=-CUT_EXTRUDE27_DEPTH, mode=Mode.SUBTRACT)


solid = part.part
